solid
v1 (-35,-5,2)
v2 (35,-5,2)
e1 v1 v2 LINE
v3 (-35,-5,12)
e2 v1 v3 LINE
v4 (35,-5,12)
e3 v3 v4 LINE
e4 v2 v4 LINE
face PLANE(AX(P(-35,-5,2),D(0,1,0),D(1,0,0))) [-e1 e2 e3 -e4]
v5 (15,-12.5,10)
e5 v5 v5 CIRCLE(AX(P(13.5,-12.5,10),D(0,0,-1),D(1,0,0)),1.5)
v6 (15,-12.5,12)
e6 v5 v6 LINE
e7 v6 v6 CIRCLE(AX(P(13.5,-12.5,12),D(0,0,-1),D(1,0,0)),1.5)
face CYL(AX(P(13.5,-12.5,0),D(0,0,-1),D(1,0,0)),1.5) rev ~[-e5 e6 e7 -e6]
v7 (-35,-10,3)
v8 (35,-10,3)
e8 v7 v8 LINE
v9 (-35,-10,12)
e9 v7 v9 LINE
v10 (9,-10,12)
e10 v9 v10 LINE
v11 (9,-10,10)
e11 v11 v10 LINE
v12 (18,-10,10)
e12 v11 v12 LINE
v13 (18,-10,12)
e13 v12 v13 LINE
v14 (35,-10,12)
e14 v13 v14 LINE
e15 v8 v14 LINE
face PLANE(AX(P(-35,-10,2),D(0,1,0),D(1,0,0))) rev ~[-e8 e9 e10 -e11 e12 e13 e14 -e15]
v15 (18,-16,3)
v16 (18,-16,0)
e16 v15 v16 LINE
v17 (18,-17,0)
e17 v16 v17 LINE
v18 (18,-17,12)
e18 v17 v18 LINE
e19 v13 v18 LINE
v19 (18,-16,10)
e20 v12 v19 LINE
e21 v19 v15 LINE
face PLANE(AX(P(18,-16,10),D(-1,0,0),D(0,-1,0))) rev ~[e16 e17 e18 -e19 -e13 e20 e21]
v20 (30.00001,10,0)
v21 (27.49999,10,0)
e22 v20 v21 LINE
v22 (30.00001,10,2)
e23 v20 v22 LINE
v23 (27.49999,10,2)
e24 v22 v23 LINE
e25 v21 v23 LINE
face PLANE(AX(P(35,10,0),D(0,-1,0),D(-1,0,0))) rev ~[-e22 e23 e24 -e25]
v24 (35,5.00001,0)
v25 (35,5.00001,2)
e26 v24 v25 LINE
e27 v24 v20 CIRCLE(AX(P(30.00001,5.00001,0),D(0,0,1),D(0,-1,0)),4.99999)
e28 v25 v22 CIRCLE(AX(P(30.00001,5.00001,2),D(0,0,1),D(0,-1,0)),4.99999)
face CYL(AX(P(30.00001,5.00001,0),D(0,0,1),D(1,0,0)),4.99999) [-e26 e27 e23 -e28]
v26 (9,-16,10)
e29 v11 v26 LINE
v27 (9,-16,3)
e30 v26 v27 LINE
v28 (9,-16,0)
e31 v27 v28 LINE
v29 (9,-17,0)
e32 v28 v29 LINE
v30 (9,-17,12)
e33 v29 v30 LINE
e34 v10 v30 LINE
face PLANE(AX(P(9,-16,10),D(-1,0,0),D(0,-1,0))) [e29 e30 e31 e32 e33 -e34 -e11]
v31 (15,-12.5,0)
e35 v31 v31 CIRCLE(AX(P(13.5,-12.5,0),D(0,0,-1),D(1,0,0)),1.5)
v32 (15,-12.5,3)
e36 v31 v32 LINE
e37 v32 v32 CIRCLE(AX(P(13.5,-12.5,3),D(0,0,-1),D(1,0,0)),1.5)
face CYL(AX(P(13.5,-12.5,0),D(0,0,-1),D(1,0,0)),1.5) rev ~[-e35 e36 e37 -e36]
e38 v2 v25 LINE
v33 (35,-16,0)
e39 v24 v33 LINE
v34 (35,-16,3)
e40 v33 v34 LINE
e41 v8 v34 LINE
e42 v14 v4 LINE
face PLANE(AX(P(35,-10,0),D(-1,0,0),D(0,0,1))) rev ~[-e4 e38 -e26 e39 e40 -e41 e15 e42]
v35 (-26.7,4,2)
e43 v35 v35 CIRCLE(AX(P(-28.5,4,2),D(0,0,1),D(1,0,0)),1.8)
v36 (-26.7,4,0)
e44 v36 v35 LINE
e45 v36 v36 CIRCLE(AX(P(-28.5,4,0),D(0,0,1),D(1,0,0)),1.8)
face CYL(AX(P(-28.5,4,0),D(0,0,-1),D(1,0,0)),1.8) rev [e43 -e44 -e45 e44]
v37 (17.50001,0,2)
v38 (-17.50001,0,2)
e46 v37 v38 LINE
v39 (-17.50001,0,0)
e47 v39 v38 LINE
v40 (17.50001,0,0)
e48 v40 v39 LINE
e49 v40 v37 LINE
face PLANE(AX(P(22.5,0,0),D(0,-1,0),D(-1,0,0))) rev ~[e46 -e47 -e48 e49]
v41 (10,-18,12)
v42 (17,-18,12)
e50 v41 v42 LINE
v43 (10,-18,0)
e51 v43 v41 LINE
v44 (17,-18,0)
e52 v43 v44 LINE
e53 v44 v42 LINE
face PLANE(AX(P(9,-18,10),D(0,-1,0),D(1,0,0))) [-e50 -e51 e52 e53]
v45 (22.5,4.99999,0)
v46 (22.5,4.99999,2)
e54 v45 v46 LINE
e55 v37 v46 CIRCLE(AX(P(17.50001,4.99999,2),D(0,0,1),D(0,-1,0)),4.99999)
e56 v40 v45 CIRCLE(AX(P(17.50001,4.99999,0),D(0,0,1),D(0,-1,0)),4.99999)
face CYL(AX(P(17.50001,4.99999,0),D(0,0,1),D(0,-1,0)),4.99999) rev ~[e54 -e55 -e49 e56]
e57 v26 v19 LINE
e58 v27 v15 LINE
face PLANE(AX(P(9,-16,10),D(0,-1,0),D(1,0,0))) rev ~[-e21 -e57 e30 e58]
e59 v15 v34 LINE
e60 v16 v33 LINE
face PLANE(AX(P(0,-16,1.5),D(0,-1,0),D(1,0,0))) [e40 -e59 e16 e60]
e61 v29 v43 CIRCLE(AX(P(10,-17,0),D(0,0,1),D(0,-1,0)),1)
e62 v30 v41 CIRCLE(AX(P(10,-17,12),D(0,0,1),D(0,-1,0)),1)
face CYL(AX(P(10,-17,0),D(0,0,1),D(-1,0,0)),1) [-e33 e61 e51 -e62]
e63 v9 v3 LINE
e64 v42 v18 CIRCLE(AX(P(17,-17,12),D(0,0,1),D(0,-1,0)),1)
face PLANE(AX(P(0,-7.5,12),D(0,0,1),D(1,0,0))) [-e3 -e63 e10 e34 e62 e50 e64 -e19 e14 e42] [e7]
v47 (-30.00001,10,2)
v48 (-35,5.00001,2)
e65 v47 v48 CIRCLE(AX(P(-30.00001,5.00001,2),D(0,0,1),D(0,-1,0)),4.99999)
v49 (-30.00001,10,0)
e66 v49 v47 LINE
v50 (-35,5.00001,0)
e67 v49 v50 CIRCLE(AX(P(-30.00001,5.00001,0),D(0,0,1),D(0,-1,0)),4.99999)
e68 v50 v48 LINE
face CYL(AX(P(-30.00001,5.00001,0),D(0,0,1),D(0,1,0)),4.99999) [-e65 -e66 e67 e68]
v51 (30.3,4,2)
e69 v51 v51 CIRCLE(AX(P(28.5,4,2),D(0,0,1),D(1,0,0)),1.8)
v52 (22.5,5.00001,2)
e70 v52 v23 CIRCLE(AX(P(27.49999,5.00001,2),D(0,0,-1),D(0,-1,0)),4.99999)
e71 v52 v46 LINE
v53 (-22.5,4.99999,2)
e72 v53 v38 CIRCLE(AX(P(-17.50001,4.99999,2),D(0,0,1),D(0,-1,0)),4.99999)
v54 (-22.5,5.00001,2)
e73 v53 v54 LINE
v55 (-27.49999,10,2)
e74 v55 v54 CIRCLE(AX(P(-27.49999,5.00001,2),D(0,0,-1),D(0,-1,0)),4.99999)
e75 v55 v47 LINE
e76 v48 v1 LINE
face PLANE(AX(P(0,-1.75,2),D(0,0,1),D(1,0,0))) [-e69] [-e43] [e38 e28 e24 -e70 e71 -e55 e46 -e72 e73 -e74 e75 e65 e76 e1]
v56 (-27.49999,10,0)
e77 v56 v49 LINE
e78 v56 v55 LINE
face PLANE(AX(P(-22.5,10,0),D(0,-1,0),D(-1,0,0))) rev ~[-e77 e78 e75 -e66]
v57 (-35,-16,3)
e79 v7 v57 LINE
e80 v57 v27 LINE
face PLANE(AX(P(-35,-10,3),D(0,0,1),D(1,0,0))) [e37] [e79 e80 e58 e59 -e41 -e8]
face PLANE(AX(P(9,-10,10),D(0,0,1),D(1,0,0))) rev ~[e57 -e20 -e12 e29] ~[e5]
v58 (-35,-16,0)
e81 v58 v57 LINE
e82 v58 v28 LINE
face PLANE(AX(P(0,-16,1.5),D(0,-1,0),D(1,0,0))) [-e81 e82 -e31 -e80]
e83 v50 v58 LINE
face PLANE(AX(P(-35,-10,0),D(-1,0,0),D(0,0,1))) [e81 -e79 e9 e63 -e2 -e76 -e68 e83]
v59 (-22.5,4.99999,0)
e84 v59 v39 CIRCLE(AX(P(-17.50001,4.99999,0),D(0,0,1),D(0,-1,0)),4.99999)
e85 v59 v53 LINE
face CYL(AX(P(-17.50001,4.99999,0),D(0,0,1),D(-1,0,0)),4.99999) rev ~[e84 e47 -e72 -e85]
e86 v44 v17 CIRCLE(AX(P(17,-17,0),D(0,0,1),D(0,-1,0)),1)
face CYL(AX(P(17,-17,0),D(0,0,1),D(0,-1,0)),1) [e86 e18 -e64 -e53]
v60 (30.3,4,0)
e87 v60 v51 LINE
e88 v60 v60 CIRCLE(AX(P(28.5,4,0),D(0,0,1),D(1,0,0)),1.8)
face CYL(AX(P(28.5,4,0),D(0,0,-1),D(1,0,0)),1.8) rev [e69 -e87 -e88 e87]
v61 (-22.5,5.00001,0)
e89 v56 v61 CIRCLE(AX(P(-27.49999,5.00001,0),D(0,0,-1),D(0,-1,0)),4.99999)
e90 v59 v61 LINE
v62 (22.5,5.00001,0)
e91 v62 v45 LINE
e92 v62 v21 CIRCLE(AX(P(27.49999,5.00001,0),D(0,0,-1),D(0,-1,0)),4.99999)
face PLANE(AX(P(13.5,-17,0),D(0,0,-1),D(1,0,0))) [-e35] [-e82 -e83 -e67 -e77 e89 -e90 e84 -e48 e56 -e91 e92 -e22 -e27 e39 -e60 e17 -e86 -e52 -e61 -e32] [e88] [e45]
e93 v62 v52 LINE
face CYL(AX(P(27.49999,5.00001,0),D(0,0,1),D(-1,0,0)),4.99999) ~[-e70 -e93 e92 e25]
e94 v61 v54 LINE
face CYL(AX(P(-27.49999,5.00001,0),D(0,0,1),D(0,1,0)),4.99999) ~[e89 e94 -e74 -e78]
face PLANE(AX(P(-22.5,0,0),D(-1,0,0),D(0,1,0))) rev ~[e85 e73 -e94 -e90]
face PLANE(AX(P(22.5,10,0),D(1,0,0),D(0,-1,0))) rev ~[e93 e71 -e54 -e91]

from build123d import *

# Parameters (mm, degrees)
F0_R      = 1.8
F1_DEPTH  = 2
F2_R      = 4.99999
F3_W      = 70
F3_H      = 5
F4_DEPTH  = 10
F5_W      = 70
F5_H      = 3
F6_DEPTH  = 6
F8_W      = 9
F8_H      = 2
F9_DEPTH  = 8
F10_W     = 9
F10_H     = 2
F11_DEPTH = 10
F7_R      = 1.5
F12_DEPTH = 12.001
F13_R     = 1


# Not quite as in the source:
# - a fillet or chamfer is up to 0.001 mm smaller than in the source, because OpenCascade refuses the exact size


with BuildPart() as f1:
    # F0 (on Top) → F1 (new body)
    with BuildSketch(Plane.XY):
        Polygon((-22.5, 10), (-35, 10), (-35, -10), (35, -10), (35, 10), (22.5, 10), (22.5, 0), (0, 0), (-22.5, 0), align=None)
        with Locations((-28.5, 4)):
            Circle(F0_R, mode=Mode.SUBTRACT)
        with Locations((28.5, 4)):
            Circle(F0_R, mode=Mode.SUBTRACT)
    extrude(amount=F1_DEPTH)

    # F2 (radius 5 in the source; OpenCascade refuses exactly that, so slightly less here)
    f2_edges = [f1.edges().sort_by_distance(p)[0] for p in [
        (22.5, 10, 1),
        (35, 10, 1),
        (-22.5, 10, 1),
        (-35, 10, 1),
        (-22.5, 0, 1),
        (22.5, 0, 1),
    ]]
    fillet(f2_edges, radius=F2_R)

    # F3 (on face) → F4 (join)
    with BuildSketch(Plane.XY.offset(2)):
        with Locations((0, -7.5)):
            Rectangle(F3_W, F3_H)
    extrude(amount=F4_DEPTH)

    # F5 (on face) → F6 (join)
    with BuildSketch(Plane.XZ.offset(10)):
        with Locations((0, 1.5)):
            Rectangle(F5_W, F5_H)
    extrude(amount=F6_DEPTH)

    # F8 (on face) → F9 (join)
    with BuildSketch(Plane.XZ.offset(10)):
        with Locations((13.5, 11)):
            Rectangle(F8_W, F8_H)
    extrude(amount=F9_DEPTH)

    # F10 (on face) → F11 (join)
    with BuildSketch(Plane(origin=(0, 0, 10), x_dir=(1, 0, 0), z_dir=(0, 0, -1))):
        with Locations((13.5, 17)):
            Rectangle(F10_W, F10_H)
    extrude(amount=F11_DEPTH)

    # F7 (on face) → F12 (cut, through all)
    with BuildSketch(Plane(origin=(0, 0, 0), x_dir=(1, 0, 0), z_dir=(0, 0, -1))):
        with Locations((13.5, 12.5)):
            Circle(F7_R)
    extrude(amount=-F12_DEPTH, mode=Mode.SUBTRACT)

    # F13
    f13_edges = [f1.edges().sort_by_distance(p)[0] for p in [
        (9, -18, 6),
        (18, -18, 6),
    ]]
    fillet(f13_edges, radius=F13_R)


solid = f1.part
